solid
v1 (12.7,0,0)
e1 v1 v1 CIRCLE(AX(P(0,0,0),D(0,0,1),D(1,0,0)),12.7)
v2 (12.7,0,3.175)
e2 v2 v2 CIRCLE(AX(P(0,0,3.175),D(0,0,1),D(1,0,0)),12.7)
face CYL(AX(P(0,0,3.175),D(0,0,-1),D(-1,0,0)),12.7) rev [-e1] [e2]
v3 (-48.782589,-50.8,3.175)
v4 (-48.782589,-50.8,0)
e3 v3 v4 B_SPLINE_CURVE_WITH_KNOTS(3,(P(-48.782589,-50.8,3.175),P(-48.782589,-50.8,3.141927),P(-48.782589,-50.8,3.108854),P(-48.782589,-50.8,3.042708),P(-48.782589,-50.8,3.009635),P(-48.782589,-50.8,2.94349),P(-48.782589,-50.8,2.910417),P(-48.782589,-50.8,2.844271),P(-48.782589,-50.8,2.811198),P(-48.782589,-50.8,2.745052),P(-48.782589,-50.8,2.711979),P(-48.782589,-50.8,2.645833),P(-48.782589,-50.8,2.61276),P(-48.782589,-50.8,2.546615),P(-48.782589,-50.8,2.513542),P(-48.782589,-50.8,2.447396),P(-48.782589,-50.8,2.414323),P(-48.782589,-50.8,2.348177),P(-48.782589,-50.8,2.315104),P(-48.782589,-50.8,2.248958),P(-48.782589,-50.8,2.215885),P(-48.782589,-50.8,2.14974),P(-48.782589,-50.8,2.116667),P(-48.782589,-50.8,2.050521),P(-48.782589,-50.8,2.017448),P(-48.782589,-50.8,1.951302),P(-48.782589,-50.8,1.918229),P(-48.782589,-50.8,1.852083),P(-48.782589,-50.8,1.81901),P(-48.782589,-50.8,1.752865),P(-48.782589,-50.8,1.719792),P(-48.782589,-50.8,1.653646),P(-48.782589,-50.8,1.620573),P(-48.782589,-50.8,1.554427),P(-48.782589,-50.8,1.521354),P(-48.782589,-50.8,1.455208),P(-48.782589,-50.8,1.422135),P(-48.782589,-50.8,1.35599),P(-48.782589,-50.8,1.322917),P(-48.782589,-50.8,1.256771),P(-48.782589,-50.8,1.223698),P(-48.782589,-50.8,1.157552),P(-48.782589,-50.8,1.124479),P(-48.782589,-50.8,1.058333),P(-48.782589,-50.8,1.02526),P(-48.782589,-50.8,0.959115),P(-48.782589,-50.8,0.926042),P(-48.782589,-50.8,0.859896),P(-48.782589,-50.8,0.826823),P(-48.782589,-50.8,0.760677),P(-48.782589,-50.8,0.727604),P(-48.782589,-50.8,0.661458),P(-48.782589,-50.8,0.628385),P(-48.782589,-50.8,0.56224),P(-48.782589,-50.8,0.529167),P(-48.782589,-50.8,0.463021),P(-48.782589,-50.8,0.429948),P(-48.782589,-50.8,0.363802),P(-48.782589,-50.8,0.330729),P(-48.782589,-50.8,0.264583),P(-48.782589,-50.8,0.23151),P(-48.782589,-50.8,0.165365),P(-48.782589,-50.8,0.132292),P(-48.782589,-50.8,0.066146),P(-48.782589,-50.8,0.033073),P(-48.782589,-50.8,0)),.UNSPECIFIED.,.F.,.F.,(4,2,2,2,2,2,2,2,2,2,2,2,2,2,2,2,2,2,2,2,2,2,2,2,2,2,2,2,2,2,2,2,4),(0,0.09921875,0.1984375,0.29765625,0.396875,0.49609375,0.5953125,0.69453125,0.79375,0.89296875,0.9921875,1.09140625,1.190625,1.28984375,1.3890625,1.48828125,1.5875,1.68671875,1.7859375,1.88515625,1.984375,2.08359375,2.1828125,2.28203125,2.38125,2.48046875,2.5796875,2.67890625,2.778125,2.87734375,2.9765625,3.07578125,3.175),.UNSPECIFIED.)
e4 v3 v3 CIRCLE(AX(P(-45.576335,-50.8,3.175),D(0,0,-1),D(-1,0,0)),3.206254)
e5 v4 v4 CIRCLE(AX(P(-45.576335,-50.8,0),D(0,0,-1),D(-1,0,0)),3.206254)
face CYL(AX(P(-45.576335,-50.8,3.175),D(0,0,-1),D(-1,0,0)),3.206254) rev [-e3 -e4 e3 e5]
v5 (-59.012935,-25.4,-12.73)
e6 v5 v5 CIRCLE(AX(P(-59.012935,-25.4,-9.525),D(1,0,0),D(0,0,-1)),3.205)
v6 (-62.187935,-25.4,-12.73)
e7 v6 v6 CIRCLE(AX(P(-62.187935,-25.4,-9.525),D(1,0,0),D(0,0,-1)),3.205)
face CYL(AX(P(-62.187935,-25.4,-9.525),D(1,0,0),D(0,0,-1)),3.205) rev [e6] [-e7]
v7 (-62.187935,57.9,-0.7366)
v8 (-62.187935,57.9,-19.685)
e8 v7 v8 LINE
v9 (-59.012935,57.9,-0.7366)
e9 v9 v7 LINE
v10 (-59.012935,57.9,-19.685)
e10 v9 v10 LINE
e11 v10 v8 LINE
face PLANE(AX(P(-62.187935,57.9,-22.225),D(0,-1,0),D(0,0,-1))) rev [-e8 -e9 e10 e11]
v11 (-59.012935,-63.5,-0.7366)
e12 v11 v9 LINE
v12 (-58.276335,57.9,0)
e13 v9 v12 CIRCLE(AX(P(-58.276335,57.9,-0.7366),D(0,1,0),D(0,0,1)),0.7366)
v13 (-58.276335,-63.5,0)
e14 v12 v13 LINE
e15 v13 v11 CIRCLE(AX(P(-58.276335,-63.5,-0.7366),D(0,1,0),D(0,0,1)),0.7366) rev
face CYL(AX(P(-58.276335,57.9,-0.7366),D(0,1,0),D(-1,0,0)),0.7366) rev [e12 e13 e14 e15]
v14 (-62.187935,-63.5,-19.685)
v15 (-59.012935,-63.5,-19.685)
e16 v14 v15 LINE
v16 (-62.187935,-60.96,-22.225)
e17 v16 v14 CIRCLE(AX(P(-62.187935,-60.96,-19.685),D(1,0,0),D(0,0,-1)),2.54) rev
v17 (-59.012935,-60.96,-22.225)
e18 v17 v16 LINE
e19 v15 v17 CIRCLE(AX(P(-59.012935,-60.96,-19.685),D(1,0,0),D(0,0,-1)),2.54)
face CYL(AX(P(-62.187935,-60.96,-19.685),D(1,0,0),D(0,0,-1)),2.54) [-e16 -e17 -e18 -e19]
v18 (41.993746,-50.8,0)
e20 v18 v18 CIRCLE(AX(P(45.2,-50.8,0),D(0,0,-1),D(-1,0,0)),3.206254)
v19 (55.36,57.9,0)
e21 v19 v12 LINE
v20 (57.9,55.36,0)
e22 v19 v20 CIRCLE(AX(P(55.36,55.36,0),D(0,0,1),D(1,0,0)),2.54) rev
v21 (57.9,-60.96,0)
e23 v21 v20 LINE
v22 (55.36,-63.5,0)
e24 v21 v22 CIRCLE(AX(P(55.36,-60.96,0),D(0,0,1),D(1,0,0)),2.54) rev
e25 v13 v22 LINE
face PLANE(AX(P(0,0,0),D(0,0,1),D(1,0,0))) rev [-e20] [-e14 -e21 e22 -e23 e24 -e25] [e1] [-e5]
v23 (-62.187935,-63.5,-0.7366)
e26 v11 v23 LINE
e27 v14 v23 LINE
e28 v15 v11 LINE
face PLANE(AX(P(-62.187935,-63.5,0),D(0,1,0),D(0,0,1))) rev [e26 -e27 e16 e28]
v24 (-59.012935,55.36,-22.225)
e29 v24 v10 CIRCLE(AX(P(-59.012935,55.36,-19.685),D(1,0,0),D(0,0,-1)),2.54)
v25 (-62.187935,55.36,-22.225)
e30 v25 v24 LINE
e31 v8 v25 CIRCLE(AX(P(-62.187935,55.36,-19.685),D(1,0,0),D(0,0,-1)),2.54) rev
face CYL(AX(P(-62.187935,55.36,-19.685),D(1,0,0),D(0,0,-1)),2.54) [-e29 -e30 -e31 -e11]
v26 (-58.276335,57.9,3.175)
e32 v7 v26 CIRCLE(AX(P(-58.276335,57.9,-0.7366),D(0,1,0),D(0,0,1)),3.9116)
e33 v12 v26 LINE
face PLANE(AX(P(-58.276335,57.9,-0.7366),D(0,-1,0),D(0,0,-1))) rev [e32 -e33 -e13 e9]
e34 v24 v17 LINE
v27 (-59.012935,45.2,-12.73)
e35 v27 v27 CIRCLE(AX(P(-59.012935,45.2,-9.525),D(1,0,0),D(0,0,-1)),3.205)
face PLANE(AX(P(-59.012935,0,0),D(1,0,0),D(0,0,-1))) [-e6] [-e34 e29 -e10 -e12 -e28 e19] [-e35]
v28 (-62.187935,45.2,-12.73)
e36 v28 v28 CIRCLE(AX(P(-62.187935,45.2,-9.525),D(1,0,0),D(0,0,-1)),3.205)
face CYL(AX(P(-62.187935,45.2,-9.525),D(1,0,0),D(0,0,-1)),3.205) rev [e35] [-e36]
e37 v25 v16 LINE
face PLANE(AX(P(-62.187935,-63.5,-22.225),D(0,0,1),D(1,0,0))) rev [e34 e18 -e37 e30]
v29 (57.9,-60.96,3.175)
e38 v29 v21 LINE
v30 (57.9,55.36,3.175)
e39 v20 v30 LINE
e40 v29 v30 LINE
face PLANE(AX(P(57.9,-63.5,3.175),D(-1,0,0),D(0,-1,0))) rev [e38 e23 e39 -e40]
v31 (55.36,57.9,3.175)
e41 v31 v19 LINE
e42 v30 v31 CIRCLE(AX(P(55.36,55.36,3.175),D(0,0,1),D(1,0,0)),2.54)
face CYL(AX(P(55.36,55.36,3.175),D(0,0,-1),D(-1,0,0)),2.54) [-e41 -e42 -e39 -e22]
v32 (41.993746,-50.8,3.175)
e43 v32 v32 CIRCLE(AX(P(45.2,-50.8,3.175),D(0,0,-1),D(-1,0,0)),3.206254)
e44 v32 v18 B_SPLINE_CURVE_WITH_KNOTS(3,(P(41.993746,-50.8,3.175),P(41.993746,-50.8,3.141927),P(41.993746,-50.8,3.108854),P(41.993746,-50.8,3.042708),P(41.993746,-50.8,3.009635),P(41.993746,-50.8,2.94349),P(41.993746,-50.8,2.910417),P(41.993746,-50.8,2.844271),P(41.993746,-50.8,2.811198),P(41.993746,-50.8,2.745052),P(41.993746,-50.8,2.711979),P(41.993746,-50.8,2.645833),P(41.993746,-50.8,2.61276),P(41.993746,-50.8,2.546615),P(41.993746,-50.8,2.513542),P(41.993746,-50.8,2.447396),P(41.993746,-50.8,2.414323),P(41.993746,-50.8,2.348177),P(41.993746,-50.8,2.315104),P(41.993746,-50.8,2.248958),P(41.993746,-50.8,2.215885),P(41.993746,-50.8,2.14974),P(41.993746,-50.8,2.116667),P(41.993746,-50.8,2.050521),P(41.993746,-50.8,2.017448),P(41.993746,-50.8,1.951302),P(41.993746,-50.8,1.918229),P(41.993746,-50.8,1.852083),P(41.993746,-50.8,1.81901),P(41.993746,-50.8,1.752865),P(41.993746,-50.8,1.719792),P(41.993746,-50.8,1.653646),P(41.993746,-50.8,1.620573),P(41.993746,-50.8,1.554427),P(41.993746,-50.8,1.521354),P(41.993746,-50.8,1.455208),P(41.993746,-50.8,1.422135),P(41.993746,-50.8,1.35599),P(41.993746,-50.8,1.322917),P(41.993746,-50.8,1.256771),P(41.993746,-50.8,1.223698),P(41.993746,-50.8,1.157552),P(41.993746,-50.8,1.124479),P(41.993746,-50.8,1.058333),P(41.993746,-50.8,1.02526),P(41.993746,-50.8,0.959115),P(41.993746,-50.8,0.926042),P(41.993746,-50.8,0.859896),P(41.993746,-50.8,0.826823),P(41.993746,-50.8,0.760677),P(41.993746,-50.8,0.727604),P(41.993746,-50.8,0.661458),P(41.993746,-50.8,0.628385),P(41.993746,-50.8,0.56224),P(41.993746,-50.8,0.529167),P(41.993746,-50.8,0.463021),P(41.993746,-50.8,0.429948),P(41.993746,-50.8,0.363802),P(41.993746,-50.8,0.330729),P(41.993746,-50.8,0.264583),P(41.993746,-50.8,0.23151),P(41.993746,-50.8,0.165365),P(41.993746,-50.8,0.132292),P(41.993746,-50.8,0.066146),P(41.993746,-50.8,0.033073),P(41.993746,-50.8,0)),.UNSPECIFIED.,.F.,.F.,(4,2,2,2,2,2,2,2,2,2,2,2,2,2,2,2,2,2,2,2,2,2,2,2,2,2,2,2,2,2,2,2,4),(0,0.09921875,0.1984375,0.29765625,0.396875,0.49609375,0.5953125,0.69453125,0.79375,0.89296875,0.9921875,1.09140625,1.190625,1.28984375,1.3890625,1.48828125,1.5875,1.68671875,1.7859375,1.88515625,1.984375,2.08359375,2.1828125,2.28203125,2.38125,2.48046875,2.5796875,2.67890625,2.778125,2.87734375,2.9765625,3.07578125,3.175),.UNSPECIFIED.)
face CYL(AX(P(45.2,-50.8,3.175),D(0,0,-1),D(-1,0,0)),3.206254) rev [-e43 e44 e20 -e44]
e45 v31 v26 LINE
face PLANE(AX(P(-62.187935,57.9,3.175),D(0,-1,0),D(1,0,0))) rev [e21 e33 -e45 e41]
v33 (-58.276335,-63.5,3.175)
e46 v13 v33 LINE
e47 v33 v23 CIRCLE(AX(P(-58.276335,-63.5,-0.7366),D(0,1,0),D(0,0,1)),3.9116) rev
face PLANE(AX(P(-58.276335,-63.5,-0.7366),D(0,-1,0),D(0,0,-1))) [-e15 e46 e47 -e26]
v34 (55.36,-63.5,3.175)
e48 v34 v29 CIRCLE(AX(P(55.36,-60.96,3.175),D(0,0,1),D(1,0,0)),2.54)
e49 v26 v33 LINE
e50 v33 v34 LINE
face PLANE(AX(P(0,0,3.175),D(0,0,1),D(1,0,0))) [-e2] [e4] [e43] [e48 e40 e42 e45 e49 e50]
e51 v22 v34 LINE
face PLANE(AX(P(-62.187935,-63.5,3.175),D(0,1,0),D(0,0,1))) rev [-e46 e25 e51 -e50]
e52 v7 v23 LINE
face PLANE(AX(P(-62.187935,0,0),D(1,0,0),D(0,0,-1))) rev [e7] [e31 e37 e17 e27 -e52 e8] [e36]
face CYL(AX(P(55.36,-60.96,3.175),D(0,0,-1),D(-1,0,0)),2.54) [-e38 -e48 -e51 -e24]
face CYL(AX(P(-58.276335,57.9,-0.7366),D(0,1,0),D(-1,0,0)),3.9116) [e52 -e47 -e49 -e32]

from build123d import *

# Parameters (mm, degrees)
SKETCH1_W                    = 121.4
SKETCH1_H                    = 120.087935058
SKETCH1_R                    = 12.7
BASE_FLANGE1_DEPTH           = 3.175
EDGE_FLANGE1_STRIP_W         = 14.1732
EDGE_FLANGE1_STRIP_H         = 3.175
EDGE_FLANGE1_STRIP_CUT_DEPTH = 121.4
EDGE_FLANGE1_DEPTH           = 121.4
FILLET1_R                    = 2.54
SKETCH9_R                    = 3.205
LOWER_T_SLOT_HOLES_DEPTH     = 135.888231543
SKETCH10_R                   = 3.206253706
UPPER_T_SLOT_HOLES_DEPTH     = 92.616264341


# Sheet-metal steps are written as plain solids
with BuildPart() as part:
    # Sketch1 → Base-Flange1 (new body)
    with BuildSketch(Plane(origin=(0, 0, 0), x_dir=(0, 1, 0), z_dir=(0, 0, 1))):
        with Locations((-2.8, 2.143967529)):
            Rectangle(SKETCH1_W, SKETCH1_H)
        with Locations(Location((0, 0, 0), (0, 0, 270))):
            Circle(SKETCH1_R, mode=Mode.SUBTRACT)
    extrude(amount=BASE_FLANGE1_DEPTH)

    # Edge-Flange1 strip (across the edge) → Edge-Flange1 strip cut (cut)
    with BuildSketch(Plane(origin=(-62.187935058, -63.5, 0), x_dir=(1, 0, 0), z_dir=(0, 1, 0))):
        with Locations((-3.175, -1.5875)):
            Rectangle(EDGE_FLANGE1_STRIP_W, EDGE_FLANGE1_STRIP_H)
    extrude(amount=EDGE_FLANGE1_STRIP_CUT_DEPTH, mode=Mode.SUBTRACT)

    # Edge-Flange1 section (across the edge) → Edge-Flange1 (add)
    with BuildSketch(Plane(origin=(-62.187935058, -63.5, 0), x_dir=(1, 0, 0), z_dir=(0, 1, 0))):
        with BuildLine():
            Line((0, 0.7366), (0, 22.225))
            Line((0, 22.225), (3.175, 22.225))
            Line((3.175, 22.225), (3.175, 0.7366))
            ThreePointArc((3.175, 0.7366), (3.390745145, 0.215745145), (3.9116, 0))
            Line((3.9116, 0), (3.9116, -3.175))
            ThreePointArc((3.9116, -3.175), (1.145681115, -2.029318885), (0, 0.7366))
        make_face()
    extrude(amount=EDGE_FLANGE1_DEPTH)

    # Fillet1
    fillet1_edges = [part.edges().sort_by_distance(p)[0] for p in [
        (-60.600435058, -63.5, -22.225),
        (-60.600435058, 57.9, -22.225),
        (57.9, 57.9, 1.5875),
        (57.9, -63.5, 1.5875),
    ]]
    fillet(fillet1_edges, radius=FILLET1_R)

    # Sketch9 → Lower T-Slot Holes (cut, through all)
    with BuildSketch(Plane.YZ.offset(-59.012935058)):
        with Locations(Location((45.2, -9.525, 0), (0, 0, 270))):
            Circle(SKETCH9_R)
        with Locations(Location((-25.4, -9.525, 0), (0, 0, 270))):
            Circle(SKETCH9_R)
    extrude(amount=-LOWER_T_SLOT_HOLES_DEPTH, mode=Mode.SUBTRACT)

    # Sketch10 → Upper T-Slot Holes (cut, through all)
    with BuildSketch(Plane(origin=(0, 0, 0), x_dir=(1, 0, 0), z_dir=(0, 0, -1))):
        with Locations(Location((-45.576335058, 50.8, 0), (0, 0, 180))):
            Circle(SKETCH10_R)
        with Locations(Location((45.2, 50.8, 0), (0, 0, 180))):
            Circle(SKETCH10_R)
    extrude(amount=-UPPER_T_SLOT_HOLES_DEPTH, mode=Mode.SUBTRACT)


solid = part.part
